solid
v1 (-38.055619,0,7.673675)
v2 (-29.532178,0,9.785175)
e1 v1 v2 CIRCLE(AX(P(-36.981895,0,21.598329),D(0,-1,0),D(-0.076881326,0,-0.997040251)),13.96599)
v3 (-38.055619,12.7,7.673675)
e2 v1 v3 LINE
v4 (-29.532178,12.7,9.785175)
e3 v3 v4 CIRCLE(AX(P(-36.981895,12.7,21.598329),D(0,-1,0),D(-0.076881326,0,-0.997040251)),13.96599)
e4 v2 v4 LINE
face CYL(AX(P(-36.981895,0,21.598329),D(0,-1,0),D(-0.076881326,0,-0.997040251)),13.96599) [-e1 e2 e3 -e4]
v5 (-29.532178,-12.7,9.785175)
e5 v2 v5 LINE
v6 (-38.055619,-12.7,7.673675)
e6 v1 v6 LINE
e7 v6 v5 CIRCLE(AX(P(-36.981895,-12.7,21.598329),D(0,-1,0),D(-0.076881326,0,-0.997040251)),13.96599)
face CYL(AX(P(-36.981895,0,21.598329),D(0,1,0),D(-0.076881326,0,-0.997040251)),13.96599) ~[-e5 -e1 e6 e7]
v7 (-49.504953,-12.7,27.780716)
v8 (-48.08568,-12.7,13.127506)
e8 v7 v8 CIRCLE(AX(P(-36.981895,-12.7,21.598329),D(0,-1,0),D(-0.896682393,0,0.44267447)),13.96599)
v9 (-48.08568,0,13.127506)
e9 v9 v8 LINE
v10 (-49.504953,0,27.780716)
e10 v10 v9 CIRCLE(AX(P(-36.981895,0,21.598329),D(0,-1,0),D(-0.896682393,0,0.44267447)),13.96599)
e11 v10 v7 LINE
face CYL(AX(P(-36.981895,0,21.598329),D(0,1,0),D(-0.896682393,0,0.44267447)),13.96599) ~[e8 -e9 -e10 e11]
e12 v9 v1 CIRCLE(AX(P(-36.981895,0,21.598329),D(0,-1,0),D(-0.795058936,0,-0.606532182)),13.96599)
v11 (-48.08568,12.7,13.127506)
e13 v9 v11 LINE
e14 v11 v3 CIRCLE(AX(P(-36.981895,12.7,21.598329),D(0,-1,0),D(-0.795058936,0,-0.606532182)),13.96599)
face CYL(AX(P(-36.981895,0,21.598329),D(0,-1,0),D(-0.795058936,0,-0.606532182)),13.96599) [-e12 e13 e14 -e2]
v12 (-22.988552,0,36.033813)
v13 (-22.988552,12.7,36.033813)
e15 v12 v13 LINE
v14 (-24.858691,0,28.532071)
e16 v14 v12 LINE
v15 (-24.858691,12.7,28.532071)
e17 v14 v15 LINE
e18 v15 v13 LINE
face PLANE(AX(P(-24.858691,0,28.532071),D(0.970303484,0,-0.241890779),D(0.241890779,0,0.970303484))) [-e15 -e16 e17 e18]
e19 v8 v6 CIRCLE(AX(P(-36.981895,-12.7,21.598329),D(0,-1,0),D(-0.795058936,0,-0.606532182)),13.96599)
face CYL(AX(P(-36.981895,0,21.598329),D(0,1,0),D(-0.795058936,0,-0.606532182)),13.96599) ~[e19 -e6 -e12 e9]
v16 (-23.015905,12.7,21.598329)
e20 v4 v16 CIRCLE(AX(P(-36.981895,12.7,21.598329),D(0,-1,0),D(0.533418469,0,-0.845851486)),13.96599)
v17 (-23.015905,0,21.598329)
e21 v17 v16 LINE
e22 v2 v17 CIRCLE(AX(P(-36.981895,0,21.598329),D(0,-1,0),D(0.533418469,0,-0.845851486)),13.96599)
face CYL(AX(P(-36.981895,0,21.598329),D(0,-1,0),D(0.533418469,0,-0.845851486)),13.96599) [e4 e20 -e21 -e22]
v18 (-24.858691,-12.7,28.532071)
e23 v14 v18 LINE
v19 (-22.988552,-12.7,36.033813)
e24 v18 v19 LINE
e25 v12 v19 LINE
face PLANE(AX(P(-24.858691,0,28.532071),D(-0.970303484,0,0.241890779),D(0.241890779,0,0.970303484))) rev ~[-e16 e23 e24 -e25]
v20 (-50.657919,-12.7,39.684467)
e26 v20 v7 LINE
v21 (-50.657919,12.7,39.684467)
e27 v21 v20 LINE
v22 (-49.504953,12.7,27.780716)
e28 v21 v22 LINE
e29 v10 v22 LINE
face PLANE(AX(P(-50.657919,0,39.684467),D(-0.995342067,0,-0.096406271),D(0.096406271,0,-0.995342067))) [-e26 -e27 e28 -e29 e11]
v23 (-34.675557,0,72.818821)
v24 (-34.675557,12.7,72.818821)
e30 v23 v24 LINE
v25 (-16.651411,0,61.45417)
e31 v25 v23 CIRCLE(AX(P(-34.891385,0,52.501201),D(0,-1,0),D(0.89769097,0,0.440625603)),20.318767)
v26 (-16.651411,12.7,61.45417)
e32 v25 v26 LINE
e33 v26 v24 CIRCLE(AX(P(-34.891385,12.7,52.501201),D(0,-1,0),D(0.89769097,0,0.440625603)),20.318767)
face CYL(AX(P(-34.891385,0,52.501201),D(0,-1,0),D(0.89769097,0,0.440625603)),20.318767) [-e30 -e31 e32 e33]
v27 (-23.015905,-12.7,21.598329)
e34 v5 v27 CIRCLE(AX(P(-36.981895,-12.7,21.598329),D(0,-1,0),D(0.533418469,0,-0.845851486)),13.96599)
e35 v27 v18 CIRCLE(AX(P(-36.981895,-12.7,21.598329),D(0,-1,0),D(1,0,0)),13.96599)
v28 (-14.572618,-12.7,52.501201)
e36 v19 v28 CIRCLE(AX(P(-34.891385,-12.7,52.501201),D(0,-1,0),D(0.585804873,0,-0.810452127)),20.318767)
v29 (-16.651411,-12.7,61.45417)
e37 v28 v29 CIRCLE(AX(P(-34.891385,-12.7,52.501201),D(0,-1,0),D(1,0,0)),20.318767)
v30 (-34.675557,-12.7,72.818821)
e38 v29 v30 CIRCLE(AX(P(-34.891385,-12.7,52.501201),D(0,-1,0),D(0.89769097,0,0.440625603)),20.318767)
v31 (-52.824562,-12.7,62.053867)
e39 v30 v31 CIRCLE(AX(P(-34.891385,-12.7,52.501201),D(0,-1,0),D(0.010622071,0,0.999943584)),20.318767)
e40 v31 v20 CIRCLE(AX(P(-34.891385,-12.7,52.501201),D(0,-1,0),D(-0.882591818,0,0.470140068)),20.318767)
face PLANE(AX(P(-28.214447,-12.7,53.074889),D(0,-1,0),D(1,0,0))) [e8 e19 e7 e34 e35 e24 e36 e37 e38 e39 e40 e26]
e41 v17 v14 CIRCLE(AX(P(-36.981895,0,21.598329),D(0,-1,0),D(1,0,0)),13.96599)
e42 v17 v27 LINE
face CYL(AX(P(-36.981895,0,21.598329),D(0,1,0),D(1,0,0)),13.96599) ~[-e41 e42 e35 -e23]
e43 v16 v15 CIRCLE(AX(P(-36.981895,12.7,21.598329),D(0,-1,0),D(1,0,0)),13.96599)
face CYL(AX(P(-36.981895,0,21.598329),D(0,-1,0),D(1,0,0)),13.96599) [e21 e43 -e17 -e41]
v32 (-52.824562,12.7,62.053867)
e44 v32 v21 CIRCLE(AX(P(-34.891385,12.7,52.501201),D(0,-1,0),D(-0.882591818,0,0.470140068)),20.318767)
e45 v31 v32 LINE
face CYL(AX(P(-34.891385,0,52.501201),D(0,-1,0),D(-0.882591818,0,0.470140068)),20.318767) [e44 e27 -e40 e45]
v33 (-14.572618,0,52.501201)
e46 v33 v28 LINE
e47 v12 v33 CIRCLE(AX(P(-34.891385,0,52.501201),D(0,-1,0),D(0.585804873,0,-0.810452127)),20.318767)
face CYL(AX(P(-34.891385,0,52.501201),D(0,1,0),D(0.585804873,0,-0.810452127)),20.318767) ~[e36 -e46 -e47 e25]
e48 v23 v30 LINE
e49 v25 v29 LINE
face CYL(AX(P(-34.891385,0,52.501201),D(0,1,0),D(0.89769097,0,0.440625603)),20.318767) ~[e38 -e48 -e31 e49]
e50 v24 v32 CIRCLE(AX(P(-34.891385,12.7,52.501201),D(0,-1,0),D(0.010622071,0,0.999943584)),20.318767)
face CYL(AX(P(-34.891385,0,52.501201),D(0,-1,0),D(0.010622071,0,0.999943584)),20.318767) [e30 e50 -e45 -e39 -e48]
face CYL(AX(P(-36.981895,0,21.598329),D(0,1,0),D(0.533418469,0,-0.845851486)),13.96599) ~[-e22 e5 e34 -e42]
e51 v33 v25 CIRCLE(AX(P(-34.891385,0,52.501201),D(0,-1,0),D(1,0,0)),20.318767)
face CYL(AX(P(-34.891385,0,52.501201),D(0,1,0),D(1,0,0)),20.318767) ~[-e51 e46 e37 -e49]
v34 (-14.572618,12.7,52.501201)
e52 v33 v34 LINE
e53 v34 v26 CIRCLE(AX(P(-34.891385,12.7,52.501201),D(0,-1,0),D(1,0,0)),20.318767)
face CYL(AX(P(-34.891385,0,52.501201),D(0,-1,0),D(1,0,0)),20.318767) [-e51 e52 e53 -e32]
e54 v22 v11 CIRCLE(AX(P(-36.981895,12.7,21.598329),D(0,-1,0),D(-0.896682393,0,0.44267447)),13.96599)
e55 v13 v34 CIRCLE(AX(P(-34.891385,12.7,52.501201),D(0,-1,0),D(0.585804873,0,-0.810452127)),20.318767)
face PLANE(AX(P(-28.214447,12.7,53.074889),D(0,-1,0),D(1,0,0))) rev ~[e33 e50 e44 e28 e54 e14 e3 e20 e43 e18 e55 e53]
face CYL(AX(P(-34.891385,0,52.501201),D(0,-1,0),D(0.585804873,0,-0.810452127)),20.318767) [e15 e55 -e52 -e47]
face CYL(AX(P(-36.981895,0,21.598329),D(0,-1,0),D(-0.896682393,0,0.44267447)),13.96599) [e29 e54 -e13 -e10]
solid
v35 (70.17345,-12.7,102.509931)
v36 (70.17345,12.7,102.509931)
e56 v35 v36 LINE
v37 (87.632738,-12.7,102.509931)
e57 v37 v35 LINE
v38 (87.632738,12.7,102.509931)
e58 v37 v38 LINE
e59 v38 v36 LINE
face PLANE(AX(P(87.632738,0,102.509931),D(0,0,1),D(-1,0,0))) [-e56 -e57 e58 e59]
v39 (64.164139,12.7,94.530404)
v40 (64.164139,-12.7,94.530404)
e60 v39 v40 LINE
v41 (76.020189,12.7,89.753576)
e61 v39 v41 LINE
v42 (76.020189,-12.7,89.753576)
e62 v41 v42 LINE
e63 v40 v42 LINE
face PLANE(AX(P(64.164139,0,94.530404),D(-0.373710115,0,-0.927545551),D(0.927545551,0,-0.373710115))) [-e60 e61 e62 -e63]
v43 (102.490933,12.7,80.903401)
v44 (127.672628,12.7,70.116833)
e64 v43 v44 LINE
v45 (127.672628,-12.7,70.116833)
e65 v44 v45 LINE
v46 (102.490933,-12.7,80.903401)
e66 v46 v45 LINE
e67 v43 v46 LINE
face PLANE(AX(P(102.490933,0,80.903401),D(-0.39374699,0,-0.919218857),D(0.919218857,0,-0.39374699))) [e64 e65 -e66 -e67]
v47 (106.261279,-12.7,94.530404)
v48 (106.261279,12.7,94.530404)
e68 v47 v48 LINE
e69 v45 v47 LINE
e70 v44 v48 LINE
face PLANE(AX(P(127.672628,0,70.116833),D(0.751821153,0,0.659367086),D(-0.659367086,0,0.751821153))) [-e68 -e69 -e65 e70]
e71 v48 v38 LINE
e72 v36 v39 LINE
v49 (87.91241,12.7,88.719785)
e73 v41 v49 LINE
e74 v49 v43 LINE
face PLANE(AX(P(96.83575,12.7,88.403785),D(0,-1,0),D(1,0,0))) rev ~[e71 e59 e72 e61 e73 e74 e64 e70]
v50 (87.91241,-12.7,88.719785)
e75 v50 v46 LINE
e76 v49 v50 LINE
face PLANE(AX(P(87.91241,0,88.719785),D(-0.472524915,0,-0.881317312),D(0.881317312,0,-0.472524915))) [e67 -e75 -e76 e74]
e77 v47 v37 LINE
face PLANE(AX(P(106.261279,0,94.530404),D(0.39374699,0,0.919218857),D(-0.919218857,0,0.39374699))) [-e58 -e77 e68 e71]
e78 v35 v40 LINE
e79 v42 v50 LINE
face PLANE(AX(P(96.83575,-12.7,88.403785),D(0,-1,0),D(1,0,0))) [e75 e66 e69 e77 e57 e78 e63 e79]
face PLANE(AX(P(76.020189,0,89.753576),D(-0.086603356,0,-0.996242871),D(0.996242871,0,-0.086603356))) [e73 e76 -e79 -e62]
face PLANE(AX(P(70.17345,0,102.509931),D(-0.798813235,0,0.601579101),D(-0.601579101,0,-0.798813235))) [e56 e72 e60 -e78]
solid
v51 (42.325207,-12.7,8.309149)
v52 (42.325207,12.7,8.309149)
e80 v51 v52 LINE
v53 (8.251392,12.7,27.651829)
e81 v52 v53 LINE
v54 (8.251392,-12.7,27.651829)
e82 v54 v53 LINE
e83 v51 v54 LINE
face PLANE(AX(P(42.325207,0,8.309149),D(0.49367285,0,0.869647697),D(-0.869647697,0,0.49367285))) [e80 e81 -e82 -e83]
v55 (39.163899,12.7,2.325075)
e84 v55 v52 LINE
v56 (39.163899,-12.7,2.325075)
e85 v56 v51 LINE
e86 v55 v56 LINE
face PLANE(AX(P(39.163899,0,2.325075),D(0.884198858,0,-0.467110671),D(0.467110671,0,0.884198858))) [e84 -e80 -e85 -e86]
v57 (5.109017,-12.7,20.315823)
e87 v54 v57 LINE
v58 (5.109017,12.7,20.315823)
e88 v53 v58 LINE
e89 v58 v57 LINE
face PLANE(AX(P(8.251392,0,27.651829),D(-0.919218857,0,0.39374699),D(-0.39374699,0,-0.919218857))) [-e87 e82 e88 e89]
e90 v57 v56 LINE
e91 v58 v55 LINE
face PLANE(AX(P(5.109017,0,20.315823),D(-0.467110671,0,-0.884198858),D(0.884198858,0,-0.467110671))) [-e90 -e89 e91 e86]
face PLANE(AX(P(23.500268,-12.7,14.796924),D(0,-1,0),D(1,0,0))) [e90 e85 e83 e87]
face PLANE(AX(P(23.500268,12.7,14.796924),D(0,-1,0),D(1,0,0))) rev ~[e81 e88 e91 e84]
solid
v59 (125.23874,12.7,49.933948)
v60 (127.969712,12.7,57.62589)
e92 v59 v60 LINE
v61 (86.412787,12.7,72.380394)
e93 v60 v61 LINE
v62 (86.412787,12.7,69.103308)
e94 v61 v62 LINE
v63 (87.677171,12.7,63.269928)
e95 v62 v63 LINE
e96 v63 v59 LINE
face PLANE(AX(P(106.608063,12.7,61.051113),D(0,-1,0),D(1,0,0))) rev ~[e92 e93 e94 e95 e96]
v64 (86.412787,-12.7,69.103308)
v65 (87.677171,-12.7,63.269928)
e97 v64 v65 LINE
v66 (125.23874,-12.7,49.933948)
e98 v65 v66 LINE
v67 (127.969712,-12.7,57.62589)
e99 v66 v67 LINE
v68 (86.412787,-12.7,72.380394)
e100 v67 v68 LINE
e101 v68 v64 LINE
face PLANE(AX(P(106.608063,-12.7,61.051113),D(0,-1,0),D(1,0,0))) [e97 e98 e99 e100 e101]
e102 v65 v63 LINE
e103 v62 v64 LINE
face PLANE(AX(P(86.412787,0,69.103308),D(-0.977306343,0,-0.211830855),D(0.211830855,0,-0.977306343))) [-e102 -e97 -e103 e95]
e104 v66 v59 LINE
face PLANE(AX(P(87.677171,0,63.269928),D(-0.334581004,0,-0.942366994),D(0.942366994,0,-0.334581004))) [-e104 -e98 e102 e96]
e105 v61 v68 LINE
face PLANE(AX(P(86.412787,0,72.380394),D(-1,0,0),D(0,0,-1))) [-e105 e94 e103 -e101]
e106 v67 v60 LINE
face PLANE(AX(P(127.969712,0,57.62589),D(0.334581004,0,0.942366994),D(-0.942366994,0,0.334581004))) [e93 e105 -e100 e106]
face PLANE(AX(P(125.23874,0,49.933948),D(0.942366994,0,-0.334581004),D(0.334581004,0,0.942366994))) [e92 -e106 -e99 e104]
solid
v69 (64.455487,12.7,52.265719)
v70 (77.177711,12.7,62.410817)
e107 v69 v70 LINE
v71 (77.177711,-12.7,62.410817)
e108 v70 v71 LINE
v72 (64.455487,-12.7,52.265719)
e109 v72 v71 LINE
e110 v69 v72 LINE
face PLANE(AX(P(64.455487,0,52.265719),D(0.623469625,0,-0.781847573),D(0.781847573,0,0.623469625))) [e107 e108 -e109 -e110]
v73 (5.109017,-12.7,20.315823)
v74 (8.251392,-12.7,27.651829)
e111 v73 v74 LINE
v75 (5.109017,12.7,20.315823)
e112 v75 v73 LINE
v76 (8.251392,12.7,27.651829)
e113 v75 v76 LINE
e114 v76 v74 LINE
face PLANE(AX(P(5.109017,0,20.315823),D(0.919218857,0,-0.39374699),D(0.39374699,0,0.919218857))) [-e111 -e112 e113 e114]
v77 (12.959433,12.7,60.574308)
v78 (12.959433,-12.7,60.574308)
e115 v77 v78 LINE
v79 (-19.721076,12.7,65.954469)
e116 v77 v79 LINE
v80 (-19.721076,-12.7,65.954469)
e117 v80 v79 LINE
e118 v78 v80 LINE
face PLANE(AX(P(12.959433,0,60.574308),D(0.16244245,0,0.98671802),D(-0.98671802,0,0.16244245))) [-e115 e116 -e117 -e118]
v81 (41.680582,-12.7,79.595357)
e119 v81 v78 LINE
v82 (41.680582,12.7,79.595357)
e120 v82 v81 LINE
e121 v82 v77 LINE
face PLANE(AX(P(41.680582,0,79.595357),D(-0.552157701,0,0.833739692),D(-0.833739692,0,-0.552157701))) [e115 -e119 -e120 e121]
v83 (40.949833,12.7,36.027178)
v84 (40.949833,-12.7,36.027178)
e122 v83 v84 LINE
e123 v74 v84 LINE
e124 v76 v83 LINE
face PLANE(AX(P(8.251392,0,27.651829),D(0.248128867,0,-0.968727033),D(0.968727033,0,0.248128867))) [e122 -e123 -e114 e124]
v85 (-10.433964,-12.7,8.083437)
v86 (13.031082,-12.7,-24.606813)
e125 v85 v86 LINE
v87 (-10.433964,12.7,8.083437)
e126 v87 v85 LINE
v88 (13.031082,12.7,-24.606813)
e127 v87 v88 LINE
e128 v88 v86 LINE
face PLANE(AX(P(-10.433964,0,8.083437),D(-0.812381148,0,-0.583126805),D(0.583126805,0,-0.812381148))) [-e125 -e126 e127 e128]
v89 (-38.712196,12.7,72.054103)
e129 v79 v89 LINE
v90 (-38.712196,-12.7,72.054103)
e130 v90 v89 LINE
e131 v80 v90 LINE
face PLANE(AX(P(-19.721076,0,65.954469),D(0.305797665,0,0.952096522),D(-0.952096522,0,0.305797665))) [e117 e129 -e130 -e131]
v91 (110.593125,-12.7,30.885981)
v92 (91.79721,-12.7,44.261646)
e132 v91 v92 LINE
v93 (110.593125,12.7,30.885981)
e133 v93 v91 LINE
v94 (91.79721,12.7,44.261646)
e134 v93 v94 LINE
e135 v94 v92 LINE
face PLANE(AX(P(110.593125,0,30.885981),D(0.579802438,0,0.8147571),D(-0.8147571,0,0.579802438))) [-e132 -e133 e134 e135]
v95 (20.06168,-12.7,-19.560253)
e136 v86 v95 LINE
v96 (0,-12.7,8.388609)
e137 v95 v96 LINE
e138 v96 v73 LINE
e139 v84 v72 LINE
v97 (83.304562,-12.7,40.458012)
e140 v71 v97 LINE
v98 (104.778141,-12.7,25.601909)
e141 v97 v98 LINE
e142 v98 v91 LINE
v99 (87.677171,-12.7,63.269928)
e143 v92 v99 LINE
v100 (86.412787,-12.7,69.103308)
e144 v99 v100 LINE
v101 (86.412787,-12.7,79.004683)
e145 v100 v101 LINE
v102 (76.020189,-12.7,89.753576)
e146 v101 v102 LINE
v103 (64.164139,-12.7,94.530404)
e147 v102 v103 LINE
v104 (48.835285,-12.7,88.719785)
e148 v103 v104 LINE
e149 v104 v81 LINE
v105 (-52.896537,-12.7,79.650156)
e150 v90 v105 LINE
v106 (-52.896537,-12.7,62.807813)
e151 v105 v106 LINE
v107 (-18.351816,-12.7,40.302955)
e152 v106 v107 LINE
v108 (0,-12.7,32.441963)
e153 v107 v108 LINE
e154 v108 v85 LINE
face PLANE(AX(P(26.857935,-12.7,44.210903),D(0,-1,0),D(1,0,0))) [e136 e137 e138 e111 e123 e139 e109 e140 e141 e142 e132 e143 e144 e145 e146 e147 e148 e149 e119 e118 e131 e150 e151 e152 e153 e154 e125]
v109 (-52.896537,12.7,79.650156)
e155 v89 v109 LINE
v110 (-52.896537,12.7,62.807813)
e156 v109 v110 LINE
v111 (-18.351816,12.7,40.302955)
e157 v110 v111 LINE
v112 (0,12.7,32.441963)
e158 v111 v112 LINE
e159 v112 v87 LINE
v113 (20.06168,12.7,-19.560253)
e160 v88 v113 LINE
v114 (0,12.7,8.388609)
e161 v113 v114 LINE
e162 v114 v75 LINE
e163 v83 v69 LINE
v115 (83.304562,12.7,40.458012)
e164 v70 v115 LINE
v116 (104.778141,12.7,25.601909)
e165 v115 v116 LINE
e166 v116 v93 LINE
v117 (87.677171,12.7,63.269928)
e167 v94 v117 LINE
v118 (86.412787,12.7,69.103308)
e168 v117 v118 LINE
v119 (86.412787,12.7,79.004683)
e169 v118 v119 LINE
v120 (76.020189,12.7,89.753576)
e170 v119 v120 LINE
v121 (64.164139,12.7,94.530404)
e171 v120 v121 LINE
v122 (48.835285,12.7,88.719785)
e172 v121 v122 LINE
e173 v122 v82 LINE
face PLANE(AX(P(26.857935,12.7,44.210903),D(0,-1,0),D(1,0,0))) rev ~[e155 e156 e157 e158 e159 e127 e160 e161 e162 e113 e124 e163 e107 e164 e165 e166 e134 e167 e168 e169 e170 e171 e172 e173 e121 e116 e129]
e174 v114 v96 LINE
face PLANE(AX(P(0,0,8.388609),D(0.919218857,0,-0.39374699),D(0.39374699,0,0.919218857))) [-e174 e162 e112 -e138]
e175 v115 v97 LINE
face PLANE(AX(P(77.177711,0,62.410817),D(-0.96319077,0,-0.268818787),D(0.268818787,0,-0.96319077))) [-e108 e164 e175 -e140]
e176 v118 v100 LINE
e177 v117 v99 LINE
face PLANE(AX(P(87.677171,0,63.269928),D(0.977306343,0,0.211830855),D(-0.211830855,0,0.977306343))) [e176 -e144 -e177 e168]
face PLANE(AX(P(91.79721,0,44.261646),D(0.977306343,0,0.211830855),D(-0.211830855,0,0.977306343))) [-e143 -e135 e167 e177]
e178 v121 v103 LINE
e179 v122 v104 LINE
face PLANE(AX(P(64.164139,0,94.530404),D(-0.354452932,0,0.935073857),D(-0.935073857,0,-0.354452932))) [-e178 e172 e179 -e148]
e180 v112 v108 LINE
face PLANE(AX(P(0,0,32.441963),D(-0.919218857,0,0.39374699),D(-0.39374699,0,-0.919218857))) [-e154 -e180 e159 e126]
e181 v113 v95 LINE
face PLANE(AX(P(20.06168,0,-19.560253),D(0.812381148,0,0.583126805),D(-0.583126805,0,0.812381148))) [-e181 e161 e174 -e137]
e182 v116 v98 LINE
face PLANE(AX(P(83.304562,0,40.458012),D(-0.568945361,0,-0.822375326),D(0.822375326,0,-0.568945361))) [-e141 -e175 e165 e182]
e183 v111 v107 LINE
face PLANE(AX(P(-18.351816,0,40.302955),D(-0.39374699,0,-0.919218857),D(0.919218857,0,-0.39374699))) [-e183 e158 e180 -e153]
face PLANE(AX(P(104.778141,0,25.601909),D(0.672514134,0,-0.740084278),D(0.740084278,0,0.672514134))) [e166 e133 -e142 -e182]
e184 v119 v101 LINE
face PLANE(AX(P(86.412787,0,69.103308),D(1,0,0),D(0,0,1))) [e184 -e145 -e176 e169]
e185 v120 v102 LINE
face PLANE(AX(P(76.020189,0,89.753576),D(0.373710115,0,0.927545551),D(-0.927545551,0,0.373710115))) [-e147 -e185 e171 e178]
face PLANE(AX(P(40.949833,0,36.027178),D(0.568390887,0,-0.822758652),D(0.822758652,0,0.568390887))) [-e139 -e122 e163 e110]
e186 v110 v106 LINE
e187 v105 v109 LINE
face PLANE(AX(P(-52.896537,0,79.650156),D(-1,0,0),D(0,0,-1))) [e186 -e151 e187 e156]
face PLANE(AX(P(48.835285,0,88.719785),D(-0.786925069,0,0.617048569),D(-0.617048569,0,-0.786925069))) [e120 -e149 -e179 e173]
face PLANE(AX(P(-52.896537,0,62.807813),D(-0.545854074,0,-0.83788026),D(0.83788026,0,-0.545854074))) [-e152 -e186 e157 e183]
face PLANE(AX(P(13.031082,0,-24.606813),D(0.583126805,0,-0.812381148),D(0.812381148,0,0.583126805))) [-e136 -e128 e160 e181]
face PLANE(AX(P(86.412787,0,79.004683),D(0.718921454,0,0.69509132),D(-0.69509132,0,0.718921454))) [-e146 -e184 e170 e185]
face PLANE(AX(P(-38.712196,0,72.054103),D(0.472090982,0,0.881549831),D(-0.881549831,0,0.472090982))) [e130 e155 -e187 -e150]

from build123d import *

# Parameters (mm, degrees)
F0_W        = 150.6141573191
F0_H        = 79.405464232
F1_DEPTH    = 63.5
F2_T1_DEPTH = 658.6141573191
F3_T1_DEPTH = 718.5752538832
F7_DEPTH    = 12.7
F9_DEPTH    = 12.7
F10_DEPTH   = 12.7


# Not quite as in the source:
# - a fillet or chamfer that OpenCascade refuses, or shapes differently, is made with other operations: its cross-section is extruded or revolved along the edge and cut away or added


with BuildPart() as f1:
    # F0 (on Front) → F1 (new body, symmetric)
    with BuildSketch(Plane.XZ):
        with Locations((-10.1514682174, 0)):
            Rectangle(F0_W, F0_H)
    extrude(amount=F1_DEPTH, both=True)

    # F2: fillet of radius 101.6 on 2 edges, made by hand

    # F2_s2 → F2_t1 (cut)
    with BuildSketch(Plane.YZ.offset(-339.4585468769)):
        with BuildLine():
            ThreePointArc((-38.1, -39.702732116), (33.7420489686, -9.9447810845), (63.5, 61.897267884))
            Line((63.5, 61.897267884), (63.5, -39.702732116))
            Line((63.5, -39.702732116), (-38.1, -39.702732116))
        make_face()
        with BuildLine():
            ThreePointArc((38.1, -39.702732116), (-33.7420489686, -9.9447810845), (-63.5, 61.897267884))
            Line((-63.5, 61.897267884), (-63.5, -39.702732116))
            Line((-63.5, -39.702732116), (38.1, -39.702732116))
        make_face()
    extrude(amount=F2_T1_DEPTH, mode=Mode.SUBTRACT)

    # F3: fillet of radius 63.5 on 1 edges, made by hand

    # F3_s2 → F3_t1 (cut)
    with BuildSketch(Plane.YZ.offset(-369.439095159)):
        with BuildLine():
            ThreePointArc((-63.5, 61.8972269458), (0, -1.6027474678), (63.5, 61.8972269458))
            ThreePointArc((63.5, 61.8972269458), (46.1422582324, 5.1011242834), (0, -32.2884529021))
            ThreePointArc((0, -32.2884529021), (-46.1422582324, 5.1011242834), (-63.5, 61.8972269458))
        make_face()
    extrude(amount=F3_T1_DEPTH, mode=Mode.SUBTRACT)


with BuildPart() as f1b:
    # F0 (on Front) → F1, piece 2 (new body, symmetric)
    with BuildSketch(Plane.XZ):
        Polygon((31.3350483775, 122.2248598933), (31.3350483775, 93.6296462137), (77.3309990764, 97.4231287837), (73.4557332426, 72.6213976741), (123.3269497752, 72.6213976741), (123.3269497752, 122.2248598933), align=None)
        Polygon((77.3309990764, 97.4231287837), (31.3350483775, 93.6296462137), (31.3350483775, 72.6213976741), (73.4557332426, 72.6213976741), align=None)
    extrude(amount=F1_DEPTH, both=True)


with BuildPart() as f7:
    # F6 (on Front) → F7 (new body, symmetric)
    with BuildSketch(Plane.XZ):
        with BuildLine():
            ThreePointArc((-36.6087691493, 35.5593333212), (-32.619344121, 34.8654693263), (-28.9966608866, 33.0562912025))
            ThreePointArc((-28.9966608866, 33.0562912025), (-25.8689313613, 34.2954979773), (-22.9885519546, 36.0338132212))
            Line((-22.9885519546, 36.0338132212), (-16.6514110853, 61.4541698217))
            ThreePointArc((-16.6514110853, 61.4541698217), (-24.0542736375, 69.6886763572), (-34.6755571583, 72.818821437))
            Line((-34.6755571583, 72.818821437), (-36.6087691493, 35.5593333212))
        make_face()
        with BuildLine():
            ThreePointArc((-43.3512285275, 34.0273458631), (-40.0763049725, 35.2171943654), (-36.6087691493, 35.5593333212))
            Line((-36.6087691493, 35.5593333212), (-34.6755571583, 72.818821437))
            ThreePointArc((-34.6755571583, 72.818821437), (-45.2570577506, 69.977044348), (-52.8245618349, 62.05386735))
            Line((-52.8245618349, 62.05386735), (-50.6579192972, 39.6844671989))
            ThreePointArc((-50.6579192972, 39.6844671989), (-47.3304404617, 36.4350200118), (-43.3512285275, 34.0273458631))
        make_face()
        with BuildLine():
            ThreePointArc((-48.0856804005, 13.1275062956), (-43.6534019652, 9.3288594795), (-38.0556191372, 7.6736745436))
            Line((-38.0556191372, 7.6736745436), (-36.779418711, 32.2703431094))
            ThreePointArc((-36.779418711, 32.2703431094), (-40.1393756094, 32.8718639323), (-43.3512285275, 34.0273458631))
            ThreePointArc((-43.3512285275, 34.0273458631), (-46.9310511113, 31.3995108928), (-49.5049525713, 27.7807158395))
            Line((-49.5049525713, 27.7807158395), (-48.0856804005, 13.1275062956))
        make_face()
        with BuildLine():
            Line((-29.5321783365, 9.785175307), (-24.8586907719, 28.5320712513))
            ThreePointArc((-24.8586907719, 28.5320712513), (-26.6763399678, 31.0240595915), (-28.9966608866, 33.0562912025))
            ThreePointArc((-28.9966608866, 33.0562912025), (-32.8498609048, 32.2852551832), (-36.779418711, 32.2703431094))
            Line((-36.779418711, 32.2703431094), (-38.0556191372, 7.6736745436))
            ThreePointArc((-38.0556191372, 7.6736745436), (-33.6236322142, 8.0421144346), (-29.5321783365, 9.785175307))
        make_face()
        with BuildLine():
            Line((-16.6514110853, 61.4541698217), (-22.9885519546, 36.0338132212))
            ThreePointArc((-22.9885519546, 36.0338132212), (-16.7985245944, 43.2545420146), (-14.5726177745, 52.5012009711))
            ThreePointArc((-14.5726177745, 52.5012009711), (-15.0991379608, 57.0967703828), (-16.6514110853, 61.4541698217))
        make_face()
        with BuildLine():
            ThreePointArc((-36.779418711, 32.2703431094), (-32.8498609048, 32.2852551832), (-28.9966608866, 33.0562912025))
            ThreePointArc((-28.9966608866, 33.0562912025), (-32.619344121, 34.8654693263), (-36.6087691493, 35.5593333212))
            Line((-36.6087691493, 35.5593333212), (-36.779418711, 32.2703431094))
        make_face()
        with BuildLine():
            ThreePointArc((-52.8245618349, 62.05386735), (-55.1155078554, 50.5423444275), (-50.6579192972, 39.6844671989))
            Line((-50.6579192972, 39.6844671989), (-52.8245618349, 62.05386735))
        make_face()
        with BuildLine():
            Line((-36.779418711, 32.2703431094), (-36.6087691493, 35.5593333212))
            ThreePointArc((-36.6087691493, 35.5593333212), (-40.0763049725, 35.2171943654), (-43.3512285275, 34.0273458631))
            ThreePointArc((-43.3512285275, 34.0273458631), (-40.1393756094, 32.8718639323), (-36.779418711, 32.2703431094))
        make_face()
        with BuildLine():
            ThreePointArc((-49.5049525713, 27.7807158395), (-46.9310511113, 31.3995108928), (-43.3512285275, 34.0273458631))
            ThreePointArc((-43.3512285275, 34.0273458631), (-47.3304404617, 36.4350200118), (-50.6579192972, 39.6844671989))
            Line((-50.6579192972, 39.6844671989), (-49.5049525713, 27.7807158395))
        make_face()
        with BuildLine():
            ThreePointArc((-28.9966608866, 33.0562912025), (-26.6763399678, 31.0240595915), (-24.8586907719, 28.5320712513))
            Line((-24.8586907719, 28.5320712513), (-22.9885519546, 36.0338132212))
            ThreePointArc((-22.9885519546, 36.0338132212), (-25.8689313613, 34.2954979773), (-28.9966608866, 33.0562912025))
        make_face()
        with BuildLine():
            ThreePointArc((-29.5321783365, 9.785175307), (-24.7530043734, 14.8527299858), (-23.0159053765, 21.5983286448))
            ThreePointArc((-23.0159053765, 21.5983286448), (-23.4844617139, 25.1855505694), (-24.8586907719, 28.5320712513))
            Line((-24.8586907719, 28.5320712513), (-29.5321783365, 9.785175307))
        make_face()
        with BuildLine():
            ThreePointArc((-49.5049525713, 27.7807158395), (-50.882832593, 20.251919629), (-48.0856804005, 13.1275062956))
            Line((-48.0856804005, 13.1275062956), (-49.5049525713, 27.7807158395))
        make_face()
    extrude(amount=F7_DEPTH, both=True)


with BuildPart() as f9:
    # F8 (on Front) → F9 (new body, symmetric)
    with BuildSketch(Plane.XZ):
        Polygon((70.1734498143, 102.5099307299), (64.1641393304, 94.530403614), (76.0201886296, 89.753575623), (87.9124104977, 88.7197852135), (102.4909329914, 80.9034005742), (127.6726275682, 70.1168328524), (106.2612786499, 94.530403614), (87.6327380538, 102.5099307299), align=None)
    extrude(amount=F9_DEPTH, both=True)


with BuildPart() as f9b:
    # F8 (on Front) → F9, piece 2 (new body, symmetric)
    with BuildSketch(Plane.XZ):
        Polygon((127.969712019, 57.6258897781), (86.4127874374, 72.3803937435), (86.4127874374, 69.103308022), (87.6771708107, 63.2699279244), (125.2387401997, 49.9339476978), align=None)
    extrude(amount=F9_DEPTH, both=True)


with BuildPart() as f9c:
    # F8 (on Front) → F9, piece 3 (new body, symmetric)
    with BuildSketch(Plane.XZ):
        Polygon((8.2513917411, 27.6518290569), (5.10901674, 20.3158228717), (39.1638986766, 2.32507498), (42.3252065188, 8.309148904), align=None)
    extrude(amount=F9_DEPTH, both=True)


with BuildPart() as f10:
    # F8 (on Front) → F10 (new body, symmetric)
    with BuildSketch(Plane.XZ):
        Polygon((-52.8965368867, 79.6501561999), (-52.8965368867, 62.8078132868), (-18.3518156409, 40.3029546142), (0, 32.4419625103), (-10.4339636263, 8.0834369776), (13.0310822278, -24.6068127453), (20.0616800202, -19.5602529613), (0, 8.388609095), (5.10901674, 20.3158228717), (8.2513917411, 27.6518290569), (40.949832648, 36.0271781683), (64.455486834, 52.2657185793), (77.1777108312, 62.4108165503), (83.3045616746, 40.4580123723), (104.7781407833, 25.6019085646), (110.5931252241, 30.8859813958), (91.7972102761, 44.2616455257), (87.6771708107, 63.2699279244), (86.4127874374, 69.103308022), (86.4127874374, 72.3803937435), (86.4127874374, 79.0046826005), (76.0201886296, 89.753575623), (64.1641393304, 94.530403614), (48.835285008, 88.7197852135), (41.6805818677, 79.5953571796), (12.9594327882, 60.5743080378), (-19.7210758924, 65.9544691443), (-38.7121960521, 72.0541030169), align=None)
    extrude(amount=F10_DEPTH, both=True)


solid = Compound([f7.part, f9.part, f9b.part, f9c.part, f10.part])
